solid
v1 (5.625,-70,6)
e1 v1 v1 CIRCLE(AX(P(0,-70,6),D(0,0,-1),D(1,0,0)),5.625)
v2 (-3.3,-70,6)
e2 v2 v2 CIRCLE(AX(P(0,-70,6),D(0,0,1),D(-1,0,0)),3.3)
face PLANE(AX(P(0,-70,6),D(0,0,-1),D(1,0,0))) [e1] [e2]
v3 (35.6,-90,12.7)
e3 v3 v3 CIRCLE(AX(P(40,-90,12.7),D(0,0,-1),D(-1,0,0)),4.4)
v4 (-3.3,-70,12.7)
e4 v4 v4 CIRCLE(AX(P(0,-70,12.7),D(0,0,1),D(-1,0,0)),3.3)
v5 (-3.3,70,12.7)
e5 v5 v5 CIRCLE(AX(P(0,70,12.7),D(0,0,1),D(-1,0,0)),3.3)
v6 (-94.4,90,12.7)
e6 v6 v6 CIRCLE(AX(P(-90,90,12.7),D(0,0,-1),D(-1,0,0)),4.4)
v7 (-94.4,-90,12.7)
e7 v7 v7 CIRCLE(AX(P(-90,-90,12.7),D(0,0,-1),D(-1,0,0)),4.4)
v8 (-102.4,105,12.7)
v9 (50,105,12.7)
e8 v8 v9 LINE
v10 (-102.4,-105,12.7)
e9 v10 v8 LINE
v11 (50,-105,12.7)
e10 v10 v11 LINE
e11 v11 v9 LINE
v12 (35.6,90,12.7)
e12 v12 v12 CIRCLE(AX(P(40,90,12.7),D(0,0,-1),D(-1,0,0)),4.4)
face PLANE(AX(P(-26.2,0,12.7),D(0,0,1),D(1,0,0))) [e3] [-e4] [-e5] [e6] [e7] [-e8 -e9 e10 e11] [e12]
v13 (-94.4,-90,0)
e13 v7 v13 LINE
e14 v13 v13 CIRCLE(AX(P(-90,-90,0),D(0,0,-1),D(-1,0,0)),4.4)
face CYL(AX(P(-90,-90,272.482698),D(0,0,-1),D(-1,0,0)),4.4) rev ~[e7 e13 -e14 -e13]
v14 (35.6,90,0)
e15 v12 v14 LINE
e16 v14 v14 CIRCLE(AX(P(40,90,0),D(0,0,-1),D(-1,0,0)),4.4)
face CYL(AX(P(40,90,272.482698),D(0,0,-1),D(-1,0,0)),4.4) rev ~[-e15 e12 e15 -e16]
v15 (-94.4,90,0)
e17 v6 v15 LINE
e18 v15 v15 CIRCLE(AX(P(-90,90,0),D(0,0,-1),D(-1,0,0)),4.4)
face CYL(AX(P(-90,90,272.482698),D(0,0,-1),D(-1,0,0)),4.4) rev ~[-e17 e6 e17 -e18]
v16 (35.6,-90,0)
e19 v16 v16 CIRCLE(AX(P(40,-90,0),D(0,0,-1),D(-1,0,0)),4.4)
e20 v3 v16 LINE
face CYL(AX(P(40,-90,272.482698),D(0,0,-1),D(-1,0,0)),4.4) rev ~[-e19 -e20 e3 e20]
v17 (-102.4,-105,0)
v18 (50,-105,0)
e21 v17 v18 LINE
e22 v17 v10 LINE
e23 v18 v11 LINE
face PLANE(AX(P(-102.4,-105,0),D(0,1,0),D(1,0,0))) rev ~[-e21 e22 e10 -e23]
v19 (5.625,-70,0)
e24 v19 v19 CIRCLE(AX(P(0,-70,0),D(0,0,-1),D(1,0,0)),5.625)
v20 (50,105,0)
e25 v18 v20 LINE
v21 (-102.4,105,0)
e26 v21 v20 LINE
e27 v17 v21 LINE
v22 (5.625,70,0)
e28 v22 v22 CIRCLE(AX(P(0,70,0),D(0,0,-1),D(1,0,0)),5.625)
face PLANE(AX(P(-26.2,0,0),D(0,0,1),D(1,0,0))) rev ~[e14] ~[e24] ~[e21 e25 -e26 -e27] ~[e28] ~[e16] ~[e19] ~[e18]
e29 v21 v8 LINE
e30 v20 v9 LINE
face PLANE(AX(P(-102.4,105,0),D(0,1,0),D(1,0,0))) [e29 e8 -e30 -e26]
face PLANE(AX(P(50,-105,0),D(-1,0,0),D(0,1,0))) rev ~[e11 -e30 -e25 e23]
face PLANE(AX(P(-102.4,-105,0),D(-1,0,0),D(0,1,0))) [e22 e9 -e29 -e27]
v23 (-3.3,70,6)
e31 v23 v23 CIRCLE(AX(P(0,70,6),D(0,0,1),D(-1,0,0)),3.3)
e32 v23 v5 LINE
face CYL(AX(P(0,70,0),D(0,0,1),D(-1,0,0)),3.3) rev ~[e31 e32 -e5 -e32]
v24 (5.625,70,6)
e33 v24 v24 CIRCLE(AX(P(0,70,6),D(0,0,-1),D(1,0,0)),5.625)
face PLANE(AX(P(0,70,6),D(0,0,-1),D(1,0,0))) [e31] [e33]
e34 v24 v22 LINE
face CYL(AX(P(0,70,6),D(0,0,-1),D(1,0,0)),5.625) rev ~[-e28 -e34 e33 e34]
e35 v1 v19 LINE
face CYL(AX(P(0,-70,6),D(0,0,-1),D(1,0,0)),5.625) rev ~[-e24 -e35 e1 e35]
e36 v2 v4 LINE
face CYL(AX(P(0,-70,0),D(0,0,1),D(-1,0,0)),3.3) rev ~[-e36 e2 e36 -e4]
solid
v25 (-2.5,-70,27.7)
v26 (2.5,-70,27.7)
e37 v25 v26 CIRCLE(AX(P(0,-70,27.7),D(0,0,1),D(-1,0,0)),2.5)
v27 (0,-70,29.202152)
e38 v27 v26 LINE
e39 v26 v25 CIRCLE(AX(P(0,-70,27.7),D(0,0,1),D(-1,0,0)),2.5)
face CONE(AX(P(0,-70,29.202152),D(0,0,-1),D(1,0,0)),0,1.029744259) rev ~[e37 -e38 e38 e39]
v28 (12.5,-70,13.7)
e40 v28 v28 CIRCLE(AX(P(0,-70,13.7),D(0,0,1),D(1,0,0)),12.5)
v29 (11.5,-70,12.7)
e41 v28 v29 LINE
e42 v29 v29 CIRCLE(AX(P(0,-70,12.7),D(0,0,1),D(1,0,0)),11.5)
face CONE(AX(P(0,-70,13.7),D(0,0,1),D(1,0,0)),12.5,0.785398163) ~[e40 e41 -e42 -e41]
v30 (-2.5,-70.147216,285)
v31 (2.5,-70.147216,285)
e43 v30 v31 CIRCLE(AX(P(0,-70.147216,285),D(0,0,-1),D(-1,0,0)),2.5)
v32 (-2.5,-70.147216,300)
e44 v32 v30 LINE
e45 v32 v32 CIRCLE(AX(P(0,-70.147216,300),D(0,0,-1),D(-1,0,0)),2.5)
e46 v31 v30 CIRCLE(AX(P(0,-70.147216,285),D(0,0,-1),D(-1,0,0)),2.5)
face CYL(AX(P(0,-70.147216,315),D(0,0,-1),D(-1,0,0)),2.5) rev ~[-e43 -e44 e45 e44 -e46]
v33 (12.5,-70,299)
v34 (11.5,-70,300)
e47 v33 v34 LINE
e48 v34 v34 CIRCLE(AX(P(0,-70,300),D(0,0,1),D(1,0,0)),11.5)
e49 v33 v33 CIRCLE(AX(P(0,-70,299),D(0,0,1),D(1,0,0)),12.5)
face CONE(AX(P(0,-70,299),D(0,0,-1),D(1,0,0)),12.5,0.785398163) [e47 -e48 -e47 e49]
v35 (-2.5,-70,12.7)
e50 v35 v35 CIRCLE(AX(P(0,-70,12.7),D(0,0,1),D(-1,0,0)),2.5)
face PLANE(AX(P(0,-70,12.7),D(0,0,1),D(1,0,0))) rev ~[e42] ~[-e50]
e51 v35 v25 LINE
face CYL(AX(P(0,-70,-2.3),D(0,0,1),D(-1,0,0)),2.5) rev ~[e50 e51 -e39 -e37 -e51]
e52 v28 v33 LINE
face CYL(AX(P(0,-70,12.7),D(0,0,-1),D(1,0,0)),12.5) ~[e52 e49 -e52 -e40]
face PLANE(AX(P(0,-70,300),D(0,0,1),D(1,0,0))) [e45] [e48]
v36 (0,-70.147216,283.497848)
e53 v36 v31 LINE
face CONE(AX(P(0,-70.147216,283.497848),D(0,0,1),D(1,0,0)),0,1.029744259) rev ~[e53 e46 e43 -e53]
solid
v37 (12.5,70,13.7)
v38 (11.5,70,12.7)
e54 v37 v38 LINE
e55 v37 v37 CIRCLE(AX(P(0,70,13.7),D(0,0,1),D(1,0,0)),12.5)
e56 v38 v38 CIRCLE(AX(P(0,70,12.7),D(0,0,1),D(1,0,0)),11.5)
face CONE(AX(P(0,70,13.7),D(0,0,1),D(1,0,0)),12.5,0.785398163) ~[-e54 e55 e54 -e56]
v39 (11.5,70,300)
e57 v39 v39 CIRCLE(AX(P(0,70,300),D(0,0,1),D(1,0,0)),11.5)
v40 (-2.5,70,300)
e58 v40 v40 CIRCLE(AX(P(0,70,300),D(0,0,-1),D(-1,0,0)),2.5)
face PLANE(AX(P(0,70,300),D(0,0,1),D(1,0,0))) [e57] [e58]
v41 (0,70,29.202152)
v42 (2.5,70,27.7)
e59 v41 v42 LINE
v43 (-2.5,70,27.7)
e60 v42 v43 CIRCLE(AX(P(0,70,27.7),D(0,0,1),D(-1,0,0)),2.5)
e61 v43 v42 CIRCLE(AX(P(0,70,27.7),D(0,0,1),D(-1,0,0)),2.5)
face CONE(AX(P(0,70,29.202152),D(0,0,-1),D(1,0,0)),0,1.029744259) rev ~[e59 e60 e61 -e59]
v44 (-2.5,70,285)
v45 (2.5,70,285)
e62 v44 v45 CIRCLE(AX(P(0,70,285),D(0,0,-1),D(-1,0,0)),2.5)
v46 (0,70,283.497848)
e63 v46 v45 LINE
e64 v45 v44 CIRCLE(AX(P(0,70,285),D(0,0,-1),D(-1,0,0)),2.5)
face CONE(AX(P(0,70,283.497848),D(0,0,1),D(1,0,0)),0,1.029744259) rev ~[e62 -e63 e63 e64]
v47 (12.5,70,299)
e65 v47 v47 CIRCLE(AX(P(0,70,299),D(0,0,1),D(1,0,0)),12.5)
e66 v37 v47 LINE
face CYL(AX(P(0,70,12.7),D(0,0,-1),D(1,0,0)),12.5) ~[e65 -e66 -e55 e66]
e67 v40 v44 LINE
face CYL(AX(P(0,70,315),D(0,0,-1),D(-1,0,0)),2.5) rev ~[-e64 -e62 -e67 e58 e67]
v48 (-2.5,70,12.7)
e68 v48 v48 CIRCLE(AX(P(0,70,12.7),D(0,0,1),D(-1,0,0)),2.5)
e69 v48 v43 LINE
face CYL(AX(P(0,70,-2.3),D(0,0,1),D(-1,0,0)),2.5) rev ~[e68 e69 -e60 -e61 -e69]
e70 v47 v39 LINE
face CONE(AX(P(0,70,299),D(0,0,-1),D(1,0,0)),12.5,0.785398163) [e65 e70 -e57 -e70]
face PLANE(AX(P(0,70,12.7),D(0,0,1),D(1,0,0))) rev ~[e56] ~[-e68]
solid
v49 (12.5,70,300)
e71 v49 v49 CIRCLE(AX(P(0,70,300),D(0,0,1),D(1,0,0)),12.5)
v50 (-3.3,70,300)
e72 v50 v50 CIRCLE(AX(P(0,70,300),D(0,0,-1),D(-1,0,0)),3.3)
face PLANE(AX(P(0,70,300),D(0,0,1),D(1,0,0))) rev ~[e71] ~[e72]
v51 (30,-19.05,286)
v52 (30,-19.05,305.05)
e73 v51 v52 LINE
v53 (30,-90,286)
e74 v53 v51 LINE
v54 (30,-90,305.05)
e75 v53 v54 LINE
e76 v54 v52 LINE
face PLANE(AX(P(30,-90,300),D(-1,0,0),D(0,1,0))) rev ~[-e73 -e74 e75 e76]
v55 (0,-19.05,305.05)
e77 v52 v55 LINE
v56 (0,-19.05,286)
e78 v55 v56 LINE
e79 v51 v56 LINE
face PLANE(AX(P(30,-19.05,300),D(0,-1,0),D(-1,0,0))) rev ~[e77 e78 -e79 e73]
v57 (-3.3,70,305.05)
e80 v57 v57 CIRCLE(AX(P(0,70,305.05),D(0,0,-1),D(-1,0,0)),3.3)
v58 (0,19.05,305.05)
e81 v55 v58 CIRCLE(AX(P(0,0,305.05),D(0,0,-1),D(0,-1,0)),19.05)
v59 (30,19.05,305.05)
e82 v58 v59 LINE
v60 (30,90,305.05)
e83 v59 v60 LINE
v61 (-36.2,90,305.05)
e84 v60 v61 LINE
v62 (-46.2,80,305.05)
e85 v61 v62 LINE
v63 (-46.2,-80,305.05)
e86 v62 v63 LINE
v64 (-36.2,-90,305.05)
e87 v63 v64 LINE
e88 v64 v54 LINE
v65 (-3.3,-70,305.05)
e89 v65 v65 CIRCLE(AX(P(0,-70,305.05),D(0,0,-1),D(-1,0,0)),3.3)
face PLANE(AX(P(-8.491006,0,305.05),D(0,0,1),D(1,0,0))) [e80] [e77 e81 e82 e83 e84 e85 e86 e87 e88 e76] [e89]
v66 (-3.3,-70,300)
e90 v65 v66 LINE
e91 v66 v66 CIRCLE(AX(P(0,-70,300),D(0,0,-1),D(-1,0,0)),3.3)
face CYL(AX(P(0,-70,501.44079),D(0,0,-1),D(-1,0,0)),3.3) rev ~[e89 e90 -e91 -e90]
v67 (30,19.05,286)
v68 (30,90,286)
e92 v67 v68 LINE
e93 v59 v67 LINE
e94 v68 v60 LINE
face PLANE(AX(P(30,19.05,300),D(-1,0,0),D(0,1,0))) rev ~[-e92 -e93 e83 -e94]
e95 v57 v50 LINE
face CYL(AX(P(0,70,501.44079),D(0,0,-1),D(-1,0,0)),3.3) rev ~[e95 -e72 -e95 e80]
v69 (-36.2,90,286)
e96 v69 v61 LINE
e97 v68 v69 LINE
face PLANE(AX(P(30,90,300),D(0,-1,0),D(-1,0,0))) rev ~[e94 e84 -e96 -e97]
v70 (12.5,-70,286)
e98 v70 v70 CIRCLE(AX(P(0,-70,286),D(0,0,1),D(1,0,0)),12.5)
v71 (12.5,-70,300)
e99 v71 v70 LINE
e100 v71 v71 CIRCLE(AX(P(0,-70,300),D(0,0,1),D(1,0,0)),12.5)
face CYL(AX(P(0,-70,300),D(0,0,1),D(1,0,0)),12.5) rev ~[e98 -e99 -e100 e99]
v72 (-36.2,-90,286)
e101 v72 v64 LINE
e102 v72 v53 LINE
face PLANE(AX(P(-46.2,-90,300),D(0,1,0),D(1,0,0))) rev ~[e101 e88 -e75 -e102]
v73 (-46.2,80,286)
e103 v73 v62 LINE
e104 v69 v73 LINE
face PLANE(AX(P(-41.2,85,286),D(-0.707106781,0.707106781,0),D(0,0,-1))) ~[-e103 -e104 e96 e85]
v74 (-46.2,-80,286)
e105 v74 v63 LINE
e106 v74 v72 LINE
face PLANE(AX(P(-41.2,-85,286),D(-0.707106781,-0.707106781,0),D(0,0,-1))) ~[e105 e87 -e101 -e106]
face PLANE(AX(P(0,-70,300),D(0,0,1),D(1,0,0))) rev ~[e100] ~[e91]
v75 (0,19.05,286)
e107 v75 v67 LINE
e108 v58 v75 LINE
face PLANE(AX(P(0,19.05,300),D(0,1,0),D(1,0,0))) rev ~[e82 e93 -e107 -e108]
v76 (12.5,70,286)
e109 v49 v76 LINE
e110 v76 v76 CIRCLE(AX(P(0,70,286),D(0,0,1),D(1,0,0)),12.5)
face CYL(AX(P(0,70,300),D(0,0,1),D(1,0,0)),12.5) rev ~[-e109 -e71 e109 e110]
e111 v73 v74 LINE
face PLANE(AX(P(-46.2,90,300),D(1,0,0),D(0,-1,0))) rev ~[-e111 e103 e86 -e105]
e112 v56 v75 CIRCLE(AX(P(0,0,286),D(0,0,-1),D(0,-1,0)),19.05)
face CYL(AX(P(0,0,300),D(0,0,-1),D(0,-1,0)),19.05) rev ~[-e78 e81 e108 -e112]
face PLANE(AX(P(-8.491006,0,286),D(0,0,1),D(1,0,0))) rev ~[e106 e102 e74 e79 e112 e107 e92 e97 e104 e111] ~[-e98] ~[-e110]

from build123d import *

# Parameters (mm, degrees)
F2_W            = 152.4
F2_H            = 210
F4_DEPTH        = 12.7
F5_R            = 12.5
F6_DEPTH        = 287.3
F7_DEPTH        = 287.3
F8_SIZE         = 1
F9_SIZE         = 1
F10_D           = 5
F10_DEPTH       = 15
F10_TIP         = 1.5021515476
F11_D           = 5
F11_DEPTH       = 15
F11_TIP         = 1.5021515476
F12_D           = 6.6
F12_DEPTH       = 15
F12_CBORE_D     = 11.25
F12_CBORE_DEPTH = 6
F12_TIP         = 1.9828400428
F14_D           = 5
F14_DEPTH       = 15
F14_TIP         = 1.5021515476
F14_2_D         = 5
F14_2_DEPTH     = 15
F14_2_TIP       = 1.5021515476
F15_DEPTH       = 14
F15_DEPTH_BACK  = 5.05
F16_R           = 12.5
F17_DEPTH       = 300.001
F19_D           = 6.6
F20_SIZE        = 10
F22_D           = 8.8


with BuildPart() as f4:
    # F2 (on Top) → F4 (new body, through all)
    with BuildSketch(Plane.XY):
        with Locations((-26.2, 0)):
            Rectangle(F2_W, F2_H)
    extrude(amount=F4_DEPTH)

    # F12
    with Locations(Plane(origin=(0, 0, 0), x_dir=(1, 0, 0), z_dir=(0, 0, -1))):
        with Locations((0, 70), (0, -70)):
            CounterBoreHole(F12_D / 2, F12_CBORE_D / 2, F12_CBORE_DEPTH, depth=F12_DEPTH)
            with Locations((0, 0, -(F12_DEPTH + F12_TIP / 2))):  # 118° drill point
                Cone(0, F12_D / 2, F12_TIP, mode=Mode.SUBTRACT)

    # F22 (through all)
    with Locations(Plane.XY.offset(12.7)):
        with Locations((-90, 90), (-90, -90), (40, -90), (40, 90)):
            Hole(F22_D / 2)


with BuildPart() as f6:
    # F5 (on offset) → F6 (new body, through all)
    with BuildSketch(Plane.XY.offset(12.7)):
        with Locations((0, 70)):
            Circle(F5_R)
    extrude(amount=F6_DEPTH)

    # F8
    f8_edges = [f6.edges().sort_by_distance(p)[0] for p in [
        (-12.5, 70, 12.7),
        (-12.5, 70, 300),
    ]]
    chamfer(f8_edges, length=F8_SIZE)

    # F10
    with Locations(Plane(origin=(0, 0, 12.7), x_dir=(1, 0, 0), z_dir=(0, 0, -1))):
        with Locations((0, -70)):
            Hole(F10_D / 2, depth=F10_DEPTH)
            with Locations((0, 0, -(F10_DEPTH + F10_TIP / 2))):  # 118° drill point
                Cone(0, F10_D / 2, F10_TIP, mode=Mode.SUBTRACT)

    # F14
    with Locations(Plane.XY.offset(300)):
        with Locations((0, -70.14721632), (0, 70)):
            Hole(F14_D / 2, depth=F14_DEPTH)
            with Locations((0, 0, -(F14_DEPTH + F14_TIP / 2))):  # 118° drill point
                Cone(0, F14_D / 2, F14_TIP, mode=Mode.SUBTRACT)


with BuildPart() as f7:
    # F5 (on offset) → F7 (new body, through all)
    with BuildSketch(Plane.XY.offset(12.7)):
        with Locations((0, -70)):
            Circle(F5_R)
    extrude(amount=F7_DEPTH)

    # F9
    f9_edges = [f7.edges().sort_by_distance(p)[0] for p in [
        (-12.5, -70, 12.7),
        (-12.5, -70, 300),
    ]]
    chamfer(f9_edges, length=F9_SIZE)

    # F11
    with Locations(Plane(origin=(0, 0, 12.7), x_dir=(1, 0, 0), z_dir=(0, 0, -1))):
        with Locations((0, 70)):
            Hole(F11_D / 2, depth=F11_DEPTH)
            with Locations((0, 0, -(F11_DEPTH + F11_TIP / 2))):  # 118° drill point
                Cone(0, F11_D / 2, F11_TIP, mode=Mode.SUBTRACT)

    # F14#2
    with Locations(Plane.XY.offset(300)):
        with Locations((0, -70.14721632), (0, 70)):
            Hole(F14_2_D / 2, depth=F14_2_DEPTH)
            with Locations((0, 0, -(F14_2_DEPTH + F14_2_TIP / 2))):  # 118° drill point
                Cone(0, F14_2_D / 2, F14_2_TIP, mode=Mode.SUBTRACT)


with BuildPart() as f15:
    # F3 (on offset) → F15 (new body, two sides)
    with BuildSketch(Plane.XY.offset(300)) as f15_sk:
        with BuildLine():
            Line((30, 19.05), (30, 90))
            Line((30, 90), (-46.2, 90))
            Line((-46.2, 90), (-46.2, -90))
            Line((-46.2, -90), (30, -90))
            Line((30, -90), (30, -19.05))
            Line((30, -19.05), (0, -19.05))
            ThreePointArc((0, -19.05), (-19.05, 0), (0, 19.05))
            Line((0, 19.05), (30, 19.05))
        make_face()
    extrude(amount=-F15_DEPTH)
    extrude(f15_sk.sketch, amount=F15_DEPTH_BACK)

    # F16 (on offset) + F15_face (on face) → F17 (cut, through all)
    with BuildSketch(Plane.XY.offset(300)):
        with Locations((0, -70)):
            Circle(F16_R)
        with Locations((0, 70)):
            Circle(F16_R)
    with BuildSketch(Plane(origin=(-10.3004424881, 0, 286), x_dir=(1, 0, 0), z_dir=(0, 0, -1))):
        with BuildLine():
            Line((40.3004424881, -90), (40.3004424881, -19.05))
            Line((40.3004424881, -19.05), (10.3004424881, -19.05))
            ThreePointArc((10.3004424881, -19.05), (-8.7495575119, 0), (10.3004424881, 19.05))
            Line((10.3004424881, 19.05), (40.3004424881, 19.05))
            Line((40.3004424881, 19.05), (40.3004424881, 90))
            Line((40.3004424881, 90), (-35.8995575119, 90))
            Line((-35.8995575119, 90), (-35.8995575119, -90))
            Line((-35.8995575119, -90), (40.3004424881, -90))
        make_face()
    extrude(amount=-F17_DEPTH, dir=(0, 0, 1), mode=Mode.SUBTRACT)

    # F19 (through all)
    with Locations(Plane.XY.offset(305.05)):
        with Locations((0, 70), (0, -70)):
            Hole(F19_D / 2)

    # F20
    f20_edges = [f15.edges().sort_by_distance(p)[0] for p in [
        (-46.2, 90, 295.525),
        (-46.2, -90, 295.525),
    ]]
    chamfer(f20_edges, length=F20_SIZE)


solid = Compound([f4.part, f6.part, f7.part, f15.part])
